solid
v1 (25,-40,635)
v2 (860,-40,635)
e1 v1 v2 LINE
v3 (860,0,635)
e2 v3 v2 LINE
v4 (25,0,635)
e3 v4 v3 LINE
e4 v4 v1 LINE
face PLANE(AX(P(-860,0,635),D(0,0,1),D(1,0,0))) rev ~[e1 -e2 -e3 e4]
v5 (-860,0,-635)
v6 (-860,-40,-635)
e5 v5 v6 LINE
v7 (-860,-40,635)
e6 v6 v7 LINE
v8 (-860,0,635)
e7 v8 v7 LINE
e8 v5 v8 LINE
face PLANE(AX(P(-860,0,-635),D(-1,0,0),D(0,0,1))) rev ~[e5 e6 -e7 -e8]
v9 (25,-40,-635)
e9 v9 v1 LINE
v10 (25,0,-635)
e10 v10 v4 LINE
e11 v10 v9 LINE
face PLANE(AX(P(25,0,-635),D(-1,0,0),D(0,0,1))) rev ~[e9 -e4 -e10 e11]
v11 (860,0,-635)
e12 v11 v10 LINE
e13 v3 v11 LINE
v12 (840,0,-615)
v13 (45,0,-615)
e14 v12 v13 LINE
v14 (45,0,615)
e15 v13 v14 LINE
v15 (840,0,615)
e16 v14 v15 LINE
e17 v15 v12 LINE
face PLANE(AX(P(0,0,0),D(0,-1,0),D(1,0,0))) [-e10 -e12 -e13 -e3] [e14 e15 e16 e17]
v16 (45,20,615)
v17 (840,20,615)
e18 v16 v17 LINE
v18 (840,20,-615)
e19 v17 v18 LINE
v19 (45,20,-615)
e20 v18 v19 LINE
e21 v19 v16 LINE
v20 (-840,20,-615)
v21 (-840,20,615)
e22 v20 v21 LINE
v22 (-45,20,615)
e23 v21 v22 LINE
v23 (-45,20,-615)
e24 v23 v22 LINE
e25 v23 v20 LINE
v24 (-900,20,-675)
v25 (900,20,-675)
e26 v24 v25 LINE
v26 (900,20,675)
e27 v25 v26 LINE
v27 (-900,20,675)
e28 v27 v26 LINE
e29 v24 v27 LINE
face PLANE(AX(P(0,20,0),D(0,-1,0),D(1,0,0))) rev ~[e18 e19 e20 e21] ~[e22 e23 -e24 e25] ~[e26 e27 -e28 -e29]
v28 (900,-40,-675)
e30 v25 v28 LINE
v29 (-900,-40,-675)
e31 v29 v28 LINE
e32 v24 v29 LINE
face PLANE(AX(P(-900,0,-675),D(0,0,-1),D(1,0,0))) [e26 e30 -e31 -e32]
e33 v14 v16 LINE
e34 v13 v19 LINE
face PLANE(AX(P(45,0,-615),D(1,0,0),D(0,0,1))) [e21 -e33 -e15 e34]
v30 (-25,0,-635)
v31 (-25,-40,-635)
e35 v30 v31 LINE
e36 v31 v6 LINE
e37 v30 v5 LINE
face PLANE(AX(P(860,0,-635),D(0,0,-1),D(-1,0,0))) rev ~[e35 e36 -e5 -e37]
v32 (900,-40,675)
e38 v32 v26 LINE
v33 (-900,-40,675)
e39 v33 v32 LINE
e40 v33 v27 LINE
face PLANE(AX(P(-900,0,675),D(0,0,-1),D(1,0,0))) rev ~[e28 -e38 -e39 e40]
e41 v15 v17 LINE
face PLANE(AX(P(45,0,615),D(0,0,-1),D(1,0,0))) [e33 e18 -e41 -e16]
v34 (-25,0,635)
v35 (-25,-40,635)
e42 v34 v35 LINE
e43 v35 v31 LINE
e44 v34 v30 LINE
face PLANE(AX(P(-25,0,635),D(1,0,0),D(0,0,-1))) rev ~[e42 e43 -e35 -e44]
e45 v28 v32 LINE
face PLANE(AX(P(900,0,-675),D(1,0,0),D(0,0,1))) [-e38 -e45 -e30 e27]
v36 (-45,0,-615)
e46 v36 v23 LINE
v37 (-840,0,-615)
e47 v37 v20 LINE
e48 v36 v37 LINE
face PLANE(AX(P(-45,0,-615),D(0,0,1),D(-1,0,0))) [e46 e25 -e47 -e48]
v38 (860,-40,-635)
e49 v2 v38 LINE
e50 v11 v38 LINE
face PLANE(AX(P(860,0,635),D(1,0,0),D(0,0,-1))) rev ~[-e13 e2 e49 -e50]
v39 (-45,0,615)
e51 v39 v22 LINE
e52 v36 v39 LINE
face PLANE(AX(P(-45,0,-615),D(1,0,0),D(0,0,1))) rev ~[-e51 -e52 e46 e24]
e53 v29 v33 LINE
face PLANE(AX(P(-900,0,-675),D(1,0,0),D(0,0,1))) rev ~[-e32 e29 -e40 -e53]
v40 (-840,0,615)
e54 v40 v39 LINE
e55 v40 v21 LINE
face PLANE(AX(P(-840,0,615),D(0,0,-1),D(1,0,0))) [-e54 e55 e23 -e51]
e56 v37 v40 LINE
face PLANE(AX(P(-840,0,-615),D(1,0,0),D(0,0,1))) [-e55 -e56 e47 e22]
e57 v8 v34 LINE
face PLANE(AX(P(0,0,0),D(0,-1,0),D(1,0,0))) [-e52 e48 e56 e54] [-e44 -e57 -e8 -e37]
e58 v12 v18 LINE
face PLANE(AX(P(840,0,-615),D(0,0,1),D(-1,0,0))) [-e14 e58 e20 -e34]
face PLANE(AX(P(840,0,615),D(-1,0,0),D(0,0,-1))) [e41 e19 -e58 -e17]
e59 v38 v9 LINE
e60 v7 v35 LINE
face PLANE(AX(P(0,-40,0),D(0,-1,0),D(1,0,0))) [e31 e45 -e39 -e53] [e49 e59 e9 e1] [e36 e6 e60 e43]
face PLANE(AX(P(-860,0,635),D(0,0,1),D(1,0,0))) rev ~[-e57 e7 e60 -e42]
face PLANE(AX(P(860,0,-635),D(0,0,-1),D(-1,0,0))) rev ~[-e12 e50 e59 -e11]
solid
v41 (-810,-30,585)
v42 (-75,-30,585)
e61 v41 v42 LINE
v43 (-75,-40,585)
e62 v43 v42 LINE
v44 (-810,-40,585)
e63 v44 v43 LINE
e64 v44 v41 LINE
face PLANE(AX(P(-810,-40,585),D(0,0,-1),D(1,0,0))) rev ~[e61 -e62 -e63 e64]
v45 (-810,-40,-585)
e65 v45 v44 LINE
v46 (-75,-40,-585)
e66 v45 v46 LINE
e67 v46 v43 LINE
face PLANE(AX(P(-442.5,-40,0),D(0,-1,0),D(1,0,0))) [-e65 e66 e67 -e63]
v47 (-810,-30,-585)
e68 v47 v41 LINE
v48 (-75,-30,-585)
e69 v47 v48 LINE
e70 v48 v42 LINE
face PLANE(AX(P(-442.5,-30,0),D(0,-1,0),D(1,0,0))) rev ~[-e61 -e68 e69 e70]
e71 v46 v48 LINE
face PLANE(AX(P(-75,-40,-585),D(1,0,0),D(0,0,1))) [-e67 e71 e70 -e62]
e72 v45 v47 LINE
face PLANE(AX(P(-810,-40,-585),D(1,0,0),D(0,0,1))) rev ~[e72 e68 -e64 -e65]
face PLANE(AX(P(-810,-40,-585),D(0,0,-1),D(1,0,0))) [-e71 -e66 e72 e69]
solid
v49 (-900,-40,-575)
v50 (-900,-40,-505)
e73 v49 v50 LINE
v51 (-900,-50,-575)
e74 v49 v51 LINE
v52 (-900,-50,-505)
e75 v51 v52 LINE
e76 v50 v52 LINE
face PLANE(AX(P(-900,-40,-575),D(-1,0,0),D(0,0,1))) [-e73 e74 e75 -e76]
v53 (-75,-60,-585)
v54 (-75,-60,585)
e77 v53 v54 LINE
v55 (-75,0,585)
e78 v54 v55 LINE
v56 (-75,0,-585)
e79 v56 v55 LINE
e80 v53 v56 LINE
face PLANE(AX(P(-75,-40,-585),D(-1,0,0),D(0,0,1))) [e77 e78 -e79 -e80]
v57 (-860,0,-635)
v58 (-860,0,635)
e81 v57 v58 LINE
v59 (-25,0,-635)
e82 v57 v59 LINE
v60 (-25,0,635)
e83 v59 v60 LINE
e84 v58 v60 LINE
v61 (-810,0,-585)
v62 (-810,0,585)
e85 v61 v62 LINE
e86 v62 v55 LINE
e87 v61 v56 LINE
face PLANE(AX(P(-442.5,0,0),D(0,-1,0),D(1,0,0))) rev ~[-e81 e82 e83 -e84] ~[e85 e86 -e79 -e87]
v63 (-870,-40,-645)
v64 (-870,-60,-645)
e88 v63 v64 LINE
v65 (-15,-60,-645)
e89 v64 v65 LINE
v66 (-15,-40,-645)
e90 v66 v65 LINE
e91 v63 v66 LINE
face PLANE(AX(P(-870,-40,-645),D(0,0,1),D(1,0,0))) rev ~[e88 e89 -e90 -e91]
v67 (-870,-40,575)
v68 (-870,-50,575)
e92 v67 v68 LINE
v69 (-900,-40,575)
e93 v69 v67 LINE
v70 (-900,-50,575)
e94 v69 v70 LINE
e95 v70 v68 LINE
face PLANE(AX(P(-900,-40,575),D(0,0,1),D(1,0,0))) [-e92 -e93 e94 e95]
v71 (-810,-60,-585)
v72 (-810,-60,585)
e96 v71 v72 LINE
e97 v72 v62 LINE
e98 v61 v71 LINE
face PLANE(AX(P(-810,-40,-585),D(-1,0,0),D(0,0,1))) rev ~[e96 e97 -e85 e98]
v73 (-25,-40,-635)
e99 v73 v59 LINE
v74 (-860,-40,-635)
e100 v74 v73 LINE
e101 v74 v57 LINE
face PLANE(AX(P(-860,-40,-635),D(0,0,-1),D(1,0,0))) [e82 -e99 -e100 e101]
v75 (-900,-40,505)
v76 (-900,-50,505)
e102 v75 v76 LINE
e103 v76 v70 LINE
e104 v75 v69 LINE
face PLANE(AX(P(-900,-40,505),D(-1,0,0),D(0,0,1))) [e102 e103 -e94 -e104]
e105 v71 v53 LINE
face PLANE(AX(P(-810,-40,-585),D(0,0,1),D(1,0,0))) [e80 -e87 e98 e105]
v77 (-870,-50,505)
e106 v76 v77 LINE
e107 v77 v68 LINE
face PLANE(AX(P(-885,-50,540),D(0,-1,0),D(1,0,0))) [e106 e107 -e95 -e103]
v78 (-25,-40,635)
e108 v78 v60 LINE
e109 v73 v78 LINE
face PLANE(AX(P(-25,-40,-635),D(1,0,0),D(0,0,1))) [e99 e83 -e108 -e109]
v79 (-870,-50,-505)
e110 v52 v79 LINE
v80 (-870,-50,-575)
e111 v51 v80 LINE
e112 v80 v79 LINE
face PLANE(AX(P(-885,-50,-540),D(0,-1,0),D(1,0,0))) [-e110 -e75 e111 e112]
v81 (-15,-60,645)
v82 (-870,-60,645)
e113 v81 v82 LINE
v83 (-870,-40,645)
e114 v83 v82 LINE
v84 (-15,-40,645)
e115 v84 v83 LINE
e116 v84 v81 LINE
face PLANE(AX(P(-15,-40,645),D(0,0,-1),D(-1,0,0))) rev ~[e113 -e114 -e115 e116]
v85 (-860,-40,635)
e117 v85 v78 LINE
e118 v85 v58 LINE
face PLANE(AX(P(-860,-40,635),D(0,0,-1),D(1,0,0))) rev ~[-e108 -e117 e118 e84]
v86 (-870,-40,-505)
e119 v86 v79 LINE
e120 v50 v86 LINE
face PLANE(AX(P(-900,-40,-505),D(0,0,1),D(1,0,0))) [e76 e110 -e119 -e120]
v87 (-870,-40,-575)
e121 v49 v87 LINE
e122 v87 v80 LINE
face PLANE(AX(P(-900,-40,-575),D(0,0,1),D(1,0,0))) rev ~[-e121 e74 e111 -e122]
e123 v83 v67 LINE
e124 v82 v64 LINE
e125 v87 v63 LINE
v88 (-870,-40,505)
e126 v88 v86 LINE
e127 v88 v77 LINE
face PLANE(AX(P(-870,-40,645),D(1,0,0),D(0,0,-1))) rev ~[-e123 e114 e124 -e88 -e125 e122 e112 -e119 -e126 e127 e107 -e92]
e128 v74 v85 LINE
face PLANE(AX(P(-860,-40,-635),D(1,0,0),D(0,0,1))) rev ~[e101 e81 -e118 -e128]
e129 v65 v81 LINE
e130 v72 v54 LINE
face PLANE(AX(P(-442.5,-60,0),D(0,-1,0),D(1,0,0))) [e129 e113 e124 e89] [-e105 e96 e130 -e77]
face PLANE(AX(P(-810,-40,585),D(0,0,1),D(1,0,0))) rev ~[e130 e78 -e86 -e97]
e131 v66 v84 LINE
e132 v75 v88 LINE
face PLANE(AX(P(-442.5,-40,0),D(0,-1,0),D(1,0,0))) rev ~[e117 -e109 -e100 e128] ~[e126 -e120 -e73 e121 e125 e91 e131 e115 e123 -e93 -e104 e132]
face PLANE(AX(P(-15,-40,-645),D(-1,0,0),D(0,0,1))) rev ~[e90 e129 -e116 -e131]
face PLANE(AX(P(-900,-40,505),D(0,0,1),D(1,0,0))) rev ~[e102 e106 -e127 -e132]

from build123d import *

# Parameters (mm, degrees)
F0_W          = 1800
F0_H          = 1350
F1_DEPTH      = 40
F0_W_2        = 50
F0_H_2        = 1230
F0_W_3        = 20
F0_H_3        = 20
F2_DEPTH      = 20
F3_DEPTH      = 40
F3_DEPTH_BACK = 20
F4_W          = 835
F4_H          = 1270
F4_W_2        = 735
F4_H_2        = 1170
F5_DEPTH      = 40
F6_DEPTH      = 20
F7_DEPTH      = 10
F4_W_3        = 30
F4_H_3        = 70
F8_DEPTH      = 10


with BuildPart() as f1:
    # F0 (on Front) → F1 (new body)
    with BuildSketch(Plane.XZ):
        Rectangle(F0_W, F0_H)
        Polygon((-860, -635), (-860, 635), (-25, 635), (25, 635), (860, 635), (860, -635), (25, -635), (-25, -635), align=None, mode=Mode.SUBTRACT)
    extrude(amount=F1_DEPTH)

    # F0 (on Front) → F2 (join)
    with BuildSketch(Plane.XZ):
        Rectangle(F0_W, F0_H)
        Polygon((-860, -635), (-860, 635), (-25, 635), (25, 635), (860, 635), (860, -635), (25, -635), (-25, -635), align=None, mode=Mode.SUBTRACT)
        Rectangle(F0_W_2, F0_H_2)
        Polygon((-25, 635), (-860, 635), (-860, -635), (-25, -635), (-25, -615), (-45, -615), (-840, -615), (-840, 615), (-45, 615), (-25, 615), align=None)
        Polygon((860, 635), (25, 635), (25, 615), (45, 615), (840, 615), (840, -615), (45, -615), (25, -615), (25, -635), (860, -635), align=None)
        with Locations((35, 0)):
            Rectangle(F0_W_3, F0_H_2)
        with Locations((-35, 0)):
            Rectangle(F0_W_3, F0_H_2)
        with Locations((0, -625)):
            Rectangle(F0_W_2, F0_H_3)
        with Locations((0, 625)):
            Rectangle(F0_W_2, F0_H_3)
    extrude(amount=-F2_DEPTH)

    # F0 (on Front) → F3 (join, two sides)
    with BuildSketch(Plane.XZ) as f3_sk:
        Rectangle(F0_W_2, F0_H_2)
        with Locations((0, 625)):
            Rectangle(F0_W_2, F0_H_3)
        with Locations((0, -625)):
            Rectangle(F0_W_2, F0_H_3)
    extrude(amount=F3_DEPTH)
    extrude(f3_sk.sketch, amount=-F3_DEPTH_BACK)


with BuildPart() as f5:
    # F4 (on face) → F5 (new body, through all)
    with BuildSketch(Plane.XZ.offset(40)):
        with Locations((-442.5, 0)):
            Rectangle(F4_W, F4_H)
        with Locations((-442.5, 0)):
            Rectangle(F4_W_2, F4_H_2, mode=Mode.SUBTRACT)
    extrude(amount=-F5_DEPTH)

    # F4 (on face) → F6 (join)
    with BuildSketch(Plane.XZ.offset(40)):
        Polygon((-870, -575), (-870, -645), (-15, -645), (-15, 645), (-870, 645), (-870, 575), (-870, 505), (-870, -505), align=None)
        with Locations((-442.5, 0)):
            Rectangle(F4_W, F4_H, mode=Mode.SUBTRACT)
        with Locations((-442.5, 0)):
            Rectangle(F4_W, F4_H)
        with Locations((-442.5, 0)):
            Rectangle(F4_W_2, F4_H_2, mode=Mode.SUBTRACT)
    extrude(amount=F6_DEPTH)

    # F4 (on face) → F8 (join)
    with BuildSketch(Plane.XZ.offset(40)):
        with Locations((-885, 540)):
            Rectangle(F4_W_3, F4_H_3)
        with Locations((-885, -540)):
            Rectangle(F4_W_3, F4_H_3)
    extrude(amount=F8_DEPTH)


with BuildPart() as f7:
    # F4 (on face) → F7 (new body)
    with BuildSketch(Plane.XZ.offset(40)):
        with Locations((-442.5, 0)):
            Rectangle(F4_W_2, F4_H_2)
    extrude(amount=-F7_DEPTH)


solid = Compound([f1.part, f5.part, f7.part])
